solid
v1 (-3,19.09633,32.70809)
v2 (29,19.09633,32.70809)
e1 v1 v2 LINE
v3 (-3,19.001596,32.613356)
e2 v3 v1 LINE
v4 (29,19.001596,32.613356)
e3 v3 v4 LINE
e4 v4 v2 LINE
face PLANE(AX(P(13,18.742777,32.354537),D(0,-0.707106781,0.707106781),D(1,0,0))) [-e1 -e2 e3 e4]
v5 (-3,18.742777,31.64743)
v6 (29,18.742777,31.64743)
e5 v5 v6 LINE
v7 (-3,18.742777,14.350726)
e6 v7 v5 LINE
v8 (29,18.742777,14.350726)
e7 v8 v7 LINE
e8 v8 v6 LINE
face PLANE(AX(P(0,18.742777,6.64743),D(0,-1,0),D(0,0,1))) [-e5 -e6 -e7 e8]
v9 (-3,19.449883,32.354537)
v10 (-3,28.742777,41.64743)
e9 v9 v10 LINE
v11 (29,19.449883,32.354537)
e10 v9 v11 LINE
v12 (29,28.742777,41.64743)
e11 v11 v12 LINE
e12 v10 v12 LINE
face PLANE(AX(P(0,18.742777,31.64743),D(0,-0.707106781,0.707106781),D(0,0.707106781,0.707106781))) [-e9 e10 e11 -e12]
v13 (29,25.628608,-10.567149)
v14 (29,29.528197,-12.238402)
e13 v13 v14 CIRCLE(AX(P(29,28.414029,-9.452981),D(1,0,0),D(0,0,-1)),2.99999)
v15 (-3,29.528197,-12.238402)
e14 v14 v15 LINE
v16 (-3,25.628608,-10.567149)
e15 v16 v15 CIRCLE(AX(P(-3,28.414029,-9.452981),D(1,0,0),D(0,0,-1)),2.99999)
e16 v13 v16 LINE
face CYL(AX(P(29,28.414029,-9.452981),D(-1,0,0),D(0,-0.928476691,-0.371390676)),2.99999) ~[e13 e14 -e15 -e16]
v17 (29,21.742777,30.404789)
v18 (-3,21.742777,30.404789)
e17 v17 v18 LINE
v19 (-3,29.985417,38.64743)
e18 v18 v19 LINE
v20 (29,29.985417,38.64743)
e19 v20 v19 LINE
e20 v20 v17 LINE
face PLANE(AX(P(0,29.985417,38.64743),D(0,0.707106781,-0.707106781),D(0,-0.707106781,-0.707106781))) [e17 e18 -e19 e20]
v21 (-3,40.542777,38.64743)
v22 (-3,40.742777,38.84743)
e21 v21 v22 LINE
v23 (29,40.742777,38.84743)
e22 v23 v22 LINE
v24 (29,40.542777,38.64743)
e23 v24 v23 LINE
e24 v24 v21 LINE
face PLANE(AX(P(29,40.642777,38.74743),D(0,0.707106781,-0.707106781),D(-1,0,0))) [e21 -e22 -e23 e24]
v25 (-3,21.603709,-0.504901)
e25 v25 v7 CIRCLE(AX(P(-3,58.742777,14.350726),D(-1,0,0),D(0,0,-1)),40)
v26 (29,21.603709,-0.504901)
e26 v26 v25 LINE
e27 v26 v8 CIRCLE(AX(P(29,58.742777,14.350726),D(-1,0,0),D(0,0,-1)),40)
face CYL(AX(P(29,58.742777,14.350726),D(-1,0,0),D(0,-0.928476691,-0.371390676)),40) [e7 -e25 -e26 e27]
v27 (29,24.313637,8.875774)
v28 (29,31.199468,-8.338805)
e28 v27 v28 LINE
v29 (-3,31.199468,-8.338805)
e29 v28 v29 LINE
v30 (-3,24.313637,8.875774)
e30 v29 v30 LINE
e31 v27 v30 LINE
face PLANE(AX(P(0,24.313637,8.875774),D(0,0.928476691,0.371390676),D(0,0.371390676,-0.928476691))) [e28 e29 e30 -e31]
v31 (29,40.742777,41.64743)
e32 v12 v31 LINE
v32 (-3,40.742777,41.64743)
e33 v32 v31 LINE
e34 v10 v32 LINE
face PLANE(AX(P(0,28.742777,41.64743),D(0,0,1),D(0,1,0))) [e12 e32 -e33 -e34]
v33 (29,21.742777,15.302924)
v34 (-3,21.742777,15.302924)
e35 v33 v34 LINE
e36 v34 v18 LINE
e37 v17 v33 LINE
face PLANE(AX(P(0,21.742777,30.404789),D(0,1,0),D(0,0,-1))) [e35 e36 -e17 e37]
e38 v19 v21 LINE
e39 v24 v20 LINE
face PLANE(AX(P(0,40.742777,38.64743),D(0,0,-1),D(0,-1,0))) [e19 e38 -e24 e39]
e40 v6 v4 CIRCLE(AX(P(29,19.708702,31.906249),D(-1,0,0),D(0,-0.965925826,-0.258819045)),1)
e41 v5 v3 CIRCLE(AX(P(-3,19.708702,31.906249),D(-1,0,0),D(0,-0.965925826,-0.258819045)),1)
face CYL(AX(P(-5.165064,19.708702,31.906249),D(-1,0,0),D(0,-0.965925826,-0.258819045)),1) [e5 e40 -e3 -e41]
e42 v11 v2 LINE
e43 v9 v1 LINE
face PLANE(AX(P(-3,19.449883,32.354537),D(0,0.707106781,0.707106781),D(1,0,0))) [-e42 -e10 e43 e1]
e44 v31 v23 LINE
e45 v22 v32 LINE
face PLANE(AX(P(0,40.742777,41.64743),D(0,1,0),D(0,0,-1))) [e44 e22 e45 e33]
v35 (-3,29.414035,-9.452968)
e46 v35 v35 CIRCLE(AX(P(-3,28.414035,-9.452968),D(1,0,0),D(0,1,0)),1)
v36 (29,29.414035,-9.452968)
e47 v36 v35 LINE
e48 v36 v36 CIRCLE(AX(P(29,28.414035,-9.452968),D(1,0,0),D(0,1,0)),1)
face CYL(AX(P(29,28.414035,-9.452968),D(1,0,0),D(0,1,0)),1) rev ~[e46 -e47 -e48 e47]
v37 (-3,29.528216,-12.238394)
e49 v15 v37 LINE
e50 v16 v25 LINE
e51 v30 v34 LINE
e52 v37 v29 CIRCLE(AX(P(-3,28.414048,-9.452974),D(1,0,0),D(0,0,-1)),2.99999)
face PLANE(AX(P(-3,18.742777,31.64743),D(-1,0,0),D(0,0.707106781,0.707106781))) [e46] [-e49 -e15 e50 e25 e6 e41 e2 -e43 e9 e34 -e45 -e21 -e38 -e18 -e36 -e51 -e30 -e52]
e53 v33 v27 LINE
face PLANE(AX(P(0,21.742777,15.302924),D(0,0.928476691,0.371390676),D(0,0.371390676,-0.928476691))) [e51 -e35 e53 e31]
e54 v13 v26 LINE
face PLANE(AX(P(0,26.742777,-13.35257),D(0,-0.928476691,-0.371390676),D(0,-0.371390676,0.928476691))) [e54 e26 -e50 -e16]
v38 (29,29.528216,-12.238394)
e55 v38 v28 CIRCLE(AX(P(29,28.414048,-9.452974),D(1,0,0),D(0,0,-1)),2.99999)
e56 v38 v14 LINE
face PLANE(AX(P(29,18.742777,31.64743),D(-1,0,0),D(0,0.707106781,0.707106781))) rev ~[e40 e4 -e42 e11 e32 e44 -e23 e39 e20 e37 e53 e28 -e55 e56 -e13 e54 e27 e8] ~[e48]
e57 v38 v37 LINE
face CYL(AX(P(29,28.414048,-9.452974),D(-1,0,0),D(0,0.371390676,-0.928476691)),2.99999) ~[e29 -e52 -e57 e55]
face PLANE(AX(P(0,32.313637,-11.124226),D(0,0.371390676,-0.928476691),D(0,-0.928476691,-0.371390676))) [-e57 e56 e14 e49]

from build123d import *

# Parameters (mm, degrees)
F0_W         = 3
F0_H         = 20
F1_DEPTH     = 10
F2_W         = 3
F2_H         = 20
F3_DEPTH     = 3
F4_DEPTH     = 10
F6_DEPTH     = 25
F7_DEPTH     = 29
F8_R         = 2.99999
F9_R         = 1
F10_DEPTH    = 100
F11_R        = 40
F12_W        = 32
F12_H        = 1
F13_DEPTH    = 0.5
F14_T1_DEPTH = 36.3301270189
F15_SIZE     = 0.2


# Not quite as in the source:
# - a fillet or chamfer that OpenCascade refuses, or shapes differently, is made with other operations: its cross-section is extruded or revolved along the edge and cut away or added
# - a fillet or chamfer is up to 0.001 mm smaller than in the source, because OpenCascade refuses the exact size


with BuildPart() as f1:
    # F0 (on Right) → F1 (new body)
    with BuildSketch(Plane.YZ):
        with Locations((42.2427766025, 31.6474299499)):
            Rectangle(F0_W, F0_H)
    extrude(amount=F1_DEPTH)

    # F2 (on face) → F3 (join)
    with BuildSketch(Plane(origin=(0, 0, 0), x_dir=(0, -1, 0), z_dir=(-1, 0, 0))):
        with Locations((-42.2427766025, 31.6474299499)):
            Rectangle(F2_W, F2_H)
        Polygon((-28.7427766025, 41.6474299499), (-40.7427766025, 41.6474299499), (-40.7427766025, 21.6474299499), (-43.7427766025, 21.6474299499), (-43.7427766025, -18.3525700501), (-28.7427766025, -18.3525700501), (-18.7427766025, 6.6474299499), (-18.7427766025, 31.6474299499), align=None)
    extrude(amount=F3_DEPTH)

    # F4 (cut): a face of the model
    f4_faces = [f1.faces().sort_by_distance(p)[0] for p in [
        (10, 42.2427766025, 31.6474299499),
    ]]
    extrude(f4_faces, amount=-F4_DEPTH, mode=Mode.SUBTRACT)

    # F5 (on face) → F6 (cut)
    with BuildSketch(Plane.YZ):
        Polygon((33.2049743711, -13.3525700501), (26.7427766025, -13.3525700501), (28.7427766025, -18.3525700501), (34.3136367478, -16.124225992), align=None)
        Polygon((41.2427766025, -13.3525700501), (33.2049743711, -13.3525700501), (34.3136367478, -16.124225992), align=None)
        Polygon((34.3136367478, -16.124225992), (28.7427766025, -18.3525700501), (43.7427766025, -18.3525700501), (43.7427766025, -13.3525700501), (41.2427766025, -13.3525700501), align=None)
        Polygon((40.7427766025, 21.6474299499), (43.7427766025, 21.6474299499), (43.7427766025, 41.6474299499), (40.7427766025, 41.6474299499), (40.7427766025, 38.6474299499), align=None)
        Polygon((32.3136367478, -11.124225992), (33.2049743711, -13.3525700501), (41.2427766025, -13.3525700501), (43.7427766025, -12.3525700501), (43.7427766025, 21.6474299499), (40.7427766025, 21.6474299499), (40.7427766025, 38.6474299499), (31.7427766025, 38.6474299499), (29.9854172896, 38.6474299499), (21.7427766025, 30.4047892628), (21.7427766025, 28.6474299499), (21.7427766025, 15.3029243713), (24.3136367478, 8.875774008), align=None)
        Polygon((43.7427766025, -12.3525700501), (41.2427766025, -13.3525700501), (43.7427766025, -13.3525700501), align=None)
        Polygon((32.3136367478, -11.124225992), (26.7427766025, -13.3525700501), (33.2049743711, -13.3525700501), align=None)
    extrude(amount=-F6_DEPTH, mode=Mode.SUBTRACT)

    # F7 (add): a face of the model
    f7_faces = [f1.faces().sort_by_distance(p)[0] for p in [
        (0, 34.7427766025, 41.0550618211),
    ]]
    extrude(f7_faces, amount=F7_DEPTH)

    # F8 (radius 3 in the source; OpenCascade refuses exactly that, so slightly less here)
    f8_edges = [f1.edges().sort_by_distance(p)[0] for p in [
        (13, 26.742777, -13.35257),
        (13, 32.313637, -11.124226),
    ]]
    fillet(f8_edges, radius=F8_R)

    # F9 (on face) → F10 (cut)
    with BuildSketch(Plane.YZ.offset(29)):
        with Locations((28.4140346461, -9.4529679484)):
            Circle(F9_R)
    extrude(amount=-F10_DEPTH, mode=Mode.SUBTRACT)

    # F11
    f11_edges = [f1.edges().sort_by_distance(p)[0] for p in [
        (13, 18.742777, 6.64743),
    ]]
    fillet(f11_edges, radius=F11_R)

    # F12 (on face) → F13 (join)
    with BuildSketch(Plane(origin=(0, -6.4523266737, 6.4523266737), x_dir=(1, 0, 0), z_dir=(0, -0.7071067812, 0.7071067812))):
        with Locations((13, 36.1312567586)):
            Rectangle(F12_W, F12_H)
    extrude(amount=F13_DEPTH)

    # F14: fillet of radius 1 on 1 edges, made by hand

    # F14_s2 → F14_t1 (cut)
    with BuildSketch(Plane.YZ.offset(-5.1650635095)):
        with BuildLine():
            ThreePointArc((18.7427766025, 31.6474299499), (18.7427766025, 32.1650680401), (19.0015956476, 32.6133557762))
            Line((19.0015956476, 32.6133557762), (18.3892232119, 32.0009833405))
            Line((18.3892232119, 32.0009833405), (18.7427766025, 31.6474299499))
        make_face()
    extrude(amount=F14_T1_DEPTH, mode=Mode.SUBTRACT)

    # F15
    f15_edges = [f1.edges().sort_by_distance(p)[0] for p in [
        (13, 40.742777, 38.64743),
    ]]
    chamfer(f15_edges, length=F15_SIZE)


solid = f1.part
